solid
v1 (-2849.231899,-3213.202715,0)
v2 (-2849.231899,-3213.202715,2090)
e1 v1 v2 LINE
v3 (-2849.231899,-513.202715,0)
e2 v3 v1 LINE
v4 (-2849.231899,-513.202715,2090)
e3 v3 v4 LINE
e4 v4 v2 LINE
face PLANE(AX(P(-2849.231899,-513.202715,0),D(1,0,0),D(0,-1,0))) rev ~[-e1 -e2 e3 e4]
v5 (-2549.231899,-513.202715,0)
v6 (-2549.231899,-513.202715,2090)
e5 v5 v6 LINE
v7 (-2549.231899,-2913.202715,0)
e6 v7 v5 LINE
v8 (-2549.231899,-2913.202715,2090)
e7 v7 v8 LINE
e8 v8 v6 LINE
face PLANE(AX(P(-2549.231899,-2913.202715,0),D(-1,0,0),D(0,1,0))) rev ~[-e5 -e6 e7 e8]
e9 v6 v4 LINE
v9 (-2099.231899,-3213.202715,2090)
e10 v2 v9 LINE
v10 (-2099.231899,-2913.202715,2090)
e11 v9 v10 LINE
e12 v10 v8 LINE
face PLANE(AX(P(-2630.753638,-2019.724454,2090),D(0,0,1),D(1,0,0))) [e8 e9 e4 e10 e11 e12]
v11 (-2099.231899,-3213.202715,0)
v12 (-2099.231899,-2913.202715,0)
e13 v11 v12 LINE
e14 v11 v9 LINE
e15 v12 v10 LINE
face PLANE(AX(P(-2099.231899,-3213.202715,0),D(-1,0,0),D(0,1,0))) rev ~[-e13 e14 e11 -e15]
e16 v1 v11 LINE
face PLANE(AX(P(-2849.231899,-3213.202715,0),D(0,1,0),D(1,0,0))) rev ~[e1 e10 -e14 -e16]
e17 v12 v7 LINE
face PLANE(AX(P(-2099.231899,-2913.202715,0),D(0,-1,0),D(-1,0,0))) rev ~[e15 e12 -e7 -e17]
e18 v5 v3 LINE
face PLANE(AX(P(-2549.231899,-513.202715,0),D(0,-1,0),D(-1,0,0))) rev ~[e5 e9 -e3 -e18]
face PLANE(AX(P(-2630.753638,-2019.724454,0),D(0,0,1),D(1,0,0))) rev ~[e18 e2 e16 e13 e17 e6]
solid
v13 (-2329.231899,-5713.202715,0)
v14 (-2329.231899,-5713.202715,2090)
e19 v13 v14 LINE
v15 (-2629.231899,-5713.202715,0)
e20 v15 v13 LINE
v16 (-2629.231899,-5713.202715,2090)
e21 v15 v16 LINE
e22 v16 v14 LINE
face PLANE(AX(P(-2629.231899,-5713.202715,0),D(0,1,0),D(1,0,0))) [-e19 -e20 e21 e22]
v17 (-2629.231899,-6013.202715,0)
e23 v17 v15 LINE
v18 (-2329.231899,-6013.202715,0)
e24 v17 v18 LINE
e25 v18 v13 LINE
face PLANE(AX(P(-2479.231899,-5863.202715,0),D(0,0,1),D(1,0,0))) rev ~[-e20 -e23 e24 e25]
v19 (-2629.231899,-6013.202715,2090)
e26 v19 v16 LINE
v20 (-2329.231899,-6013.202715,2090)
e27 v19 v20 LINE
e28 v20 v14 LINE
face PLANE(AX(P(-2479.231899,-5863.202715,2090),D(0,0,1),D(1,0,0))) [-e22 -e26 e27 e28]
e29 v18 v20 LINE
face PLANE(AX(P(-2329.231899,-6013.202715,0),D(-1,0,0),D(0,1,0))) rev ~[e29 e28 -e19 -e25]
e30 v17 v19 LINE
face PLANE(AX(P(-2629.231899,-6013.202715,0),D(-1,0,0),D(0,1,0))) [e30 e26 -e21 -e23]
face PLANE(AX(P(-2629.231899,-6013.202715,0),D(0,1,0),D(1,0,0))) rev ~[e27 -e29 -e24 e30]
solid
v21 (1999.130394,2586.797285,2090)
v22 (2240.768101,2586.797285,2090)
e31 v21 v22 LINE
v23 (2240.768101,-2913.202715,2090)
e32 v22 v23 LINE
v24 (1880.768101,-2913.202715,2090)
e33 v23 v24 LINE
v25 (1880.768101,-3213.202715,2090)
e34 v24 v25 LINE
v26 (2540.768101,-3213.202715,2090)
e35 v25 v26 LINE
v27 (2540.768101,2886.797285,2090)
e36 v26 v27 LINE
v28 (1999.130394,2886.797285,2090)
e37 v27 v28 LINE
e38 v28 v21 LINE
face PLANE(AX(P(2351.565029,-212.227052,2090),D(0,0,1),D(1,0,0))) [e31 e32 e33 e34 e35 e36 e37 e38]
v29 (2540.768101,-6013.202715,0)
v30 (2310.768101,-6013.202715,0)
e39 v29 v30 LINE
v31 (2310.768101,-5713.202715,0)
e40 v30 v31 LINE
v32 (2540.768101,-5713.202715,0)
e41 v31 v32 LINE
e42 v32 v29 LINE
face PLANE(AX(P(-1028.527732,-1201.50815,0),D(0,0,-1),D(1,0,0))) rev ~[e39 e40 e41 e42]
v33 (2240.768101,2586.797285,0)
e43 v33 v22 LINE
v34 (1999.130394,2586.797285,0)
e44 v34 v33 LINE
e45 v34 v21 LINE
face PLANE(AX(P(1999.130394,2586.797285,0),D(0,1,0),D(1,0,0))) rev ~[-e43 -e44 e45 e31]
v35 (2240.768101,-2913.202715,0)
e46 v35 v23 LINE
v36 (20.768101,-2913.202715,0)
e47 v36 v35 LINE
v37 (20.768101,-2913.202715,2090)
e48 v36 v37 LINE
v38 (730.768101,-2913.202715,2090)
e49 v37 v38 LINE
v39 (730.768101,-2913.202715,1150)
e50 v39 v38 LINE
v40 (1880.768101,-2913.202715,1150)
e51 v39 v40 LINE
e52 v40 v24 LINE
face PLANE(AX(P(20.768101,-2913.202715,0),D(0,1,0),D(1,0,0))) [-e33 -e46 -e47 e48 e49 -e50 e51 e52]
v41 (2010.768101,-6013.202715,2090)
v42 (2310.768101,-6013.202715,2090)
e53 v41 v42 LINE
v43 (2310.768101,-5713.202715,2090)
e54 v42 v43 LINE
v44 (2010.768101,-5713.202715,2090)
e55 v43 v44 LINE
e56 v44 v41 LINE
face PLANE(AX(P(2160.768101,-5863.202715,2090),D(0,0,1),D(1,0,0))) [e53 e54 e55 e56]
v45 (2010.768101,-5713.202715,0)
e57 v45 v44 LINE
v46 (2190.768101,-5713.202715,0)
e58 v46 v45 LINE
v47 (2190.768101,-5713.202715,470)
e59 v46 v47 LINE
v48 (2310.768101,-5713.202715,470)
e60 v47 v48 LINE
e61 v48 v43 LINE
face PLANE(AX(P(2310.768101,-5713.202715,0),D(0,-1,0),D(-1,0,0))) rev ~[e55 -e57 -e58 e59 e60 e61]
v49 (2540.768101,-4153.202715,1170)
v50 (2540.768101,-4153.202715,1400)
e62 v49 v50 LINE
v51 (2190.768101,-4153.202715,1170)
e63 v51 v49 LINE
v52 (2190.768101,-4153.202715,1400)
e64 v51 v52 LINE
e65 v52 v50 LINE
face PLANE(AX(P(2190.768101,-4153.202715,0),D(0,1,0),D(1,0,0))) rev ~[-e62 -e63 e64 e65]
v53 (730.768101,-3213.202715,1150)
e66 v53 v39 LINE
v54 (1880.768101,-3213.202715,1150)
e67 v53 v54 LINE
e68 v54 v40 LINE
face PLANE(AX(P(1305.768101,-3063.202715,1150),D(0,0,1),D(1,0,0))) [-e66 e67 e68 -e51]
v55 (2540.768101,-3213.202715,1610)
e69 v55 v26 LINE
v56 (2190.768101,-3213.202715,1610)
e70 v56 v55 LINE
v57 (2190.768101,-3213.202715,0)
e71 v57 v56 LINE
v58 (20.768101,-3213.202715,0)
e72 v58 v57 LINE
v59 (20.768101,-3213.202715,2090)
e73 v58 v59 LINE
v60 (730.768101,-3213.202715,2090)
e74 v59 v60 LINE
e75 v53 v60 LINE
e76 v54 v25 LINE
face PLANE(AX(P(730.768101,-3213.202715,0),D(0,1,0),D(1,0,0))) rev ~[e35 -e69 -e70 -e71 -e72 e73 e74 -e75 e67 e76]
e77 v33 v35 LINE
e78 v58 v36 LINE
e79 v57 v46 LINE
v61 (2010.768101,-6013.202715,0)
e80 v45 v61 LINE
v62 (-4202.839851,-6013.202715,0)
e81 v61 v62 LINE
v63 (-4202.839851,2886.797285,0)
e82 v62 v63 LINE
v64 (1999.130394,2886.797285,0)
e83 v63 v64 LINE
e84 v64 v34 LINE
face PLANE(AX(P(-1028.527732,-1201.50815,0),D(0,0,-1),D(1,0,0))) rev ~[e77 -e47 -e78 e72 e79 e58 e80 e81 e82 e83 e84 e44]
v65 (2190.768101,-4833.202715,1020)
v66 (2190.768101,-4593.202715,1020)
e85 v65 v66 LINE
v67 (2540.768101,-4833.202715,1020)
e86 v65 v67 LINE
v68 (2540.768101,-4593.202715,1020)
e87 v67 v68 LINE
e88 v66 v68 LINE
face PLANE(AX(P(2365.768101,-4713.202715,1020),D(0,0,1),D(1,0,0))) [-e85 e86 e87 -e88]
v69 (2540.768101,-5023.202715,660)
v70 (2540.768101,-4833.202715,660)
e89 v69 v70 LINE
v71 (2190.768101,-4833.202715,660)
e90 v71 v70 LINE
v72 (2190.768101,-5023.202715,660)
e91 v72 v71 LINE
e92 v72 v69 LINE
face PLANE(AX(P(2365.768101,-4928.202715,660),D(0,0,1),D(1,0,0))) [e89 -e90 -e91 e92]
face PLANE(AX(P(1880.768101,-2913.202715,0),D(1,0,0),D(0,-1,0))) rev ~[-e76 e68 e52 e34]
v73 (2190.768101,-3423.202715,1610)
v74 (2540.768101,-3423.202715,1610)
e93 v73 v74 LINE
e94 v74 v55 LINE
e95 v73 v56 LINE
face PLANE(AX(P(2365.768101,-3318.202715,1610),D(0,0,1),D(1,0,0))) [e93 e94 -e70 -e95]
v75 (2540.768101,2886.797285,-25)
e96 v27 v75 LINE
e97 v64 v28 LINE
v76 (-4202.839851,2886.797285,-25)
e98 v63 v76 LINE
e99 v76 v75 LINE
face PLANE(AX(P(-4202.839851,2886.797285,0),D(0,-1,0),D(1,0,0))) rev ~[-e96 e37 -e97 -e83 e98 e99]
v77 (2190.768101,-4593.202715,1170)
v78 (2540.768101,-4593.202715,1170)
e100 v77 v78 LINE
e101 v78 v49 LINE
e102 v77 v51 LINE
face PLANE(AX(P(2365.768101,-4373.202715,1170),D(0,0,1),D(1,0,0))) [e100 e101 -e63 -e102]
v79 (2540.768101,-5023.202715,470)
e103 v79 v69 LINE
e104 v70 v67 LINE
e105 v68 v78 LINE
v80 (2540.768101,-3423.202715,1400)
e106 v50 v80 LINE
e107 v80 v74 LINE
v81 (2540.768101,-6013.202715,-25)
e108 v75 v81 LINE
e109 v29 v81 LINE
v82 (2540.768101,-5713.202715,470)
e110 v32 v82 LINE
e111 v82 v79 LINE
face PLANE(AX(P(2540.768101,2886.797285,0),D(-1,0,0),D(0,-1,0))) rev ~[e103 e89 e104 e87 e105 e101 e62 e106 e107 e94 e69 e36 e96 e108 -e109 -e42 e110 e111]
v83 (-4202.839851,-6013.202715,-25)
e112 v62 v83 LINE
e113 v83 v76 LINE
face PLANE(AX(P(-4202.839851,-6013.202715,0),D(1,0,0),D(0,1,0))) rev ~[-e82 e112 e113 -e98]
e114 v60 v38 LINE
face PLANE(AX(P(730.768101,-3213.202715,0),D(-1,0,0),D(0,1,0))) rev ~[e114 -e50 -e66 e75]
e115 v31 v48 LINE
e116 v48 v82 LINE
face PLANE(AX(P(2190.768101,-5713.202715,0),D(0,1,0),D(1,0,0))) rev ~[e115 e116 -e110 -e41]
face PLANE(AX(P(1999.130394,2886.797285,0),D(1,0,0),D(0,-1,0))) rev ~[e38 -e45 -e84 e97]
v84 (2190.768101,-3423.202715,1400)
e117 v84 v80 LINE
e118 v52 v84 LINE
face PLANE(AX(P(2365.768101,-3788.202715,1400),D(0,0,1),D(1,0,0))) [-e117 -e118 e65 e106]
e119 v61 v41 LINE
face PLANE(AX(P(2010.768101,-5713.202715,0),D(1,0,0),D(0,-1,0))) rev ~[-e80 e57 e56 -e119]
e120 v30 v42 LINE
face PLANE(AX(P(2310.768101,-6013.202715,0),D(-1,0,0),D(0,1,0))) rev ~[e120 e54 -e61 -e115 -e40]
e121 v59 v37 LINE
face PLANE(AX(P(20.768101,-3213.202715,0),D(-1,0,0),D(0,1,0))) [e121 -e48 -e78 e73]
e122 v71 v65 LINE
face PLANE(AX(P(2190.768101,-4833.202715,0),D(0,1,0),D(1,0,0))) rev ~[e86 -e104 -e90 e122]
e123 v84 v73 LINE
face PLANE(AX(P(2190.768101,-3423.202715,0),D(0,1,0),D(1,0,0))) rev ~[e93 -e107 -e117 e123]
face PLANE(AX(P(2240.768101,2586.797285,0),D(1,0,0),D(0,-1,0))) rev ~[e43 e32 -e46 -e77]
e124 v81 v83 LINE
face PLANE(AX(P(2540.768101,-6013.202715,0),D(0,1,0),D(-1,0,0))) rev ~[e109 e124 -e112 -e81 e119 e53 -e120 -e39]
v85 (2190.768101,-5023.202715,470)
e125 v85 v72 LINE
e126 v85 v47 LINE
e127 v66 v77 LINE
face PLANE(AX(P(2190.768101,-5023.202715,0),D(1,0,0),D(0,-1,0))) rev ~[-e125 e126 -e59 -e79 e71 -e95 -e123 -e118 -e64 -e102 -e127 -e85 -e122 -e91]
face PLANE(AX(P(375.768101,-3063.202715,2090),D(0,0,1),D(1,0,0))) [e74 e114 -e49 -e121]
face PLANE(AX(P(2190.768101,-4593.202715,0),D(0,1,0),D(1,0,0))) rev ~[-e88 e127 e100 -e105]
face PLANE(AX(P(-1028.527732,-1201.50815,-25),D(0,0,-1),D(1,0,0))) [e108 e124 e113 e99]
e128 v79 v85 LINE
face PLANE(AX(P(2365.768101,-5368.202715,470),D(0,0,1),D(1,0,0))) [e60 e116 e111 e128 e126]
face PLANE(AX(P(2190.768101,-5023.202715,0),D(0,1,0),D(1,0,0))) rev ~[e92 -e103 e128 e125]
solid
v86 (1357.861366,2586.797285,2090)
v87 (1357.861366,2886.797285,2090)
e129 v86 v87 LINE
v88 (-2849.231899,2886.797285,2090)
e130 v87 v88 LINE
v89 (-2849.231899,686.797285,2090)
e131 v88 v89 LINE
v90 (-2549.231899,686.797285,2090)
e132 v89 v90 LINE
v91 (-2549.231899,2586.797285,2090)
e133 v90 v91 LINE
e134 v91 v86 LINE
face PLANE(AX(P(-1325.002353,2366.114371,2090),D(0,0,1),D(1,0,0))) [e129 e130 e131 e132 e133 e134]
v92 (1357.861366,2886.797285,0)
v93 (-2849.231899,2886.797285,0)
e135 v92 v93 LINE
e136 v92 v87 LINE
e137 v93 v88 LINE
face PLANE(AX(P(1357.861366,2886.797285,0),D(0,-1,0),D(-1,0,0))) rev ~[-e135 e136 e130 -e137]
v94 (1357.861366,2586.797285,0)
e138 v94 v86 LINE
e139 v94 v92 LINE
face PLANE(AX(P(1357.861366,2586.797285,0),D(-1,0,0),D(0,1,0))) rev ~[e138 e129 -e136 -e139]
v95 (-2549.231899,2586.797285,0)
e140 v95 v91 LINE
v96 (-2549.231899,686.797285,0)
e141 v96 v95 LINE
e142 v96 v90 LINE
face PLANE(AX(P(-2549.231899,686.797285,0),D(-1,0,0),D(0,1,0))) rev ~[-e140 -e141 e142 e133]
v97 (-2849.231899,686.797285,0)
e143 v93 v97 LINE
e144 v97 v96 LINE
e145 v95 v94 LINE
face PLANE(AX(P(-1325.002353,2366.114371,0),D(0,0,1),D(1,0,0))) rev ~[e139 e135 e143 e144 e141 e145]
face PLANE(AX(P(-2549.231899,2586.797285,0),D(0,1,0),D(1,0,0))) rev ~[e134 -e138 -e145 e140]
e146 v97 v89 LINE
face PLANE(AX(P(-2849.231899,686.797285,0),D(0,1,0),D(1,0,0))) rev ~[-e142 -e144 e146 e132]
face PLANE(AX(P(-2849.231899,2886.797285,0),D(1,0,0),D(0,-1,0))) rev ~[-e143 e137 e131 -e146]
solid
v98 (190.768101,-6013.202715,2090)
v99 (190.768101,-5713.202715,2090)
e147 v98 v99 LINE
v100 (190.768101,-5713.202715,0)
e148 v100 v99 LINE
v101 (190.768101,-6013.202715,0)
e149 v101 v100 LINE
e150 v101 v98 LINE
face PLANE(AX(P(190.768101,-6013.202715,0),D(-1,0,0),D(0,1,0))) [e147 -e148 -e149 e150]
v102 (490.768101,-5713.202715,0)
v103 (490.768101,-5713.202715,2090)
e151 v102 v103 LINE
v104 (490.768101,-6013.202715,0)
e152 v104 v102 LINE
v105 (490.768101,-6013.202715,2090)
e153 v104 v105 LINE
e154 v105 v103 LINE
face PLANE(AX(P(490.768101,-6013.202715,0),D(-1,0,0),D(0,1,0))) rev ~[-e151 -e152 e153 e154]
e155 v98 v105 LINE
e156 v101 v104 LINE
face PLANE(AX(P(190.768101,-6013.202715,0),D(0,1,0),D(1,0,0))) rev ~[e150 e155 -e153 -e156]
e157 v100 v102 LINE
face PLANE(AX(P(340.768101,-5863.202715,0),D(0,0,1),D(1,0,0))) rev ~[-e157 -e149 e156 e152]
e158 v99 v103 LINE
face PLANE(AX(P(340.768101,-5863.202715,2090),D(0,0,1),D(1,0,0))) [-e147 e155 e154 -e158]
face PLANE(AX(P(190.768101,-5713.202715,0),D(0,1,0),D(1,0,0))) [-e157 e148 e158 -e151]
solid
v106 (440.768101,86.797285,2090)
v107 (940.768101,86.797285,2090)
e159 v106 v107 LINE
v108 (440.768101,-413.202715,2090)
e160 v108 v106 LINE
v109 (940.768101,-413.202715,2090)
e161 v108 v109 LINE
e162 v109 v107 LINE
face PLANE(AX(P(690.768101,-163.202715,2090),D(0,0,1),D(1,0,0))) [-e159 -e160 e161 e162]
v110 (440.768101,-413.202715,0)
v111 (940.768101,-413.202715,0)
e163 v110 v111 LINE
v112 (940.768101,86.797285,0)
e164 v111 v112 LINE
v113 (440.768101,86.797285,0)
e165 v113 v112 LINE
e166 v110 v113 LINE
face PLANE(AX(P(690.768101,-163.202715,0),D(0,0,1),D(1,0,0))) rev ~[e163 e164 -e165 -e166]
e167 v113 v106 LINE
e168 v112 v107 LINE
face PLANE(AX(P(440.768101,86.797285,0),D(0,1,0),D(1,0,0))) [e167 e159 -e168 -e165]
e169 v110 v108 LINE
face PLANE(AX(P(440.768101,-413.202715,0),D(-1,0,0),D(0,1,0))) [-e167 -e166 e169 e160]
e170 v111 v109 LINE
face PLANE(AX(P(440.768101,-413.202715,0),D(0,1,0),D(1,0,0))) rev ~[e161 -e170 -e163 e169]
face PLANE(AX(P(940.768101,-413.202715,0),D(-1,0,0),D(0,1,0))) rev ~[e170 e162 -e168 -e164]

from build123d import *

# Parameters (mm, degrees)
F0_W      = 350
F0_H      = 210
F1_DEPTH  = 1610
F0_H_2    = 730
F2_DEPTH  = 1400
F0_H_3    = 440
F3_DEPTH  = 1170
F0_H_4    = 240
F4_DEPTH  = 1020
F0_H_5    = 190
F5_DEPTH  = 660
F6_DEPTH  = 470
F0_W_2    = 300
F0_H_6    = 300
F7_DEPTH  = 2090
F8_DEPTH  = 2090
F0_W_3    = 500
F0_H_7    = 500
F0_W_4    = 710
F10_DEPTH = 25
F11_W     = 1150
F11_H     = 300
F12_DEPTH = 1150


# Not quite as in the source:
# - a feature of the source that left no trace in its solid (it failed there, or was rolled back) is left out


with BuildPart() as f1:
    # F0 (on Top) → F1 (new body)
    with BuildSketch(Plane.XY):
        with Locations((2365.7681007385, -3318.20271492)):
            Rectangle(F0_W, F0_H)
    extrude(amount=F1_DEPTH)

    # F0 (on Top) → F2 (join)
    with BuildSketch(Plane.XY):
        with Locations((2365.7681007385, -3788.20271492)):
            Rectangle(F0_W, F0_H_2)
    extrude(amount=F2_DEPTH)

    # F0 (on Top) → F3 (join)
    with BuildSketch(Plane.XY):
        with Locations((2365.7681007385, -4373.20271492)):
            Rectangle(F0_W, F0_H_3)
    extrude(amount=F3_DEPTH)

    # F0 (on Top) → F4 (join)
    with BuildSketch(Plane.XY):
        with Locations((2365.7681007385, -4713.20271492)):
            Rectangle(F0_W, F0_H_4)
    extrude(amount=F4_DEPTH)

    # F0 (on Top) → F5 (join)
    with BuildSketch(Plane.XY):
        with Locations((2365.7681007385, -4928.20271492)):
            Rectangle(F0_W, F0_H_5)
    extrude(amount=F5_DEPTH)

    # F0 (on Top) → F6 (join)
    with BuildSketch(Plane.XY):
        Polygon((2540.7681007385, -5023.20271492), (2190.7681007385, -5023.20271492), (2190.7681007385, -5713.20271492), (2310.7681007385, -5713.20271492), (2540.7681007385, -5713.20271492), align=None)
    extrude(amount=F6_DEPTH)

    # F0 (on Top) → F7, piece 3 (join)
    with BuildSketch(Plane.XY):
        Polygon((2310.7681007385, -5713.20271492), (2190.7681007385, -5713.20271492), (2010.7681007385, -5713.20271492), (2010.7681007385, -6013.20271492), (2310.7681007385, -6013.20271492), align=None)
    extrude(amount=F7_DEPTH)

    # F0 (on Top) → F8, piece 5 (join)
    with BuildSketch(Plane.XY):
        Polygon((2240.7681007385, -2913.20271492), (1880.7681007385, -2913.20271492), (1880.7681007385, -3213.20271492), (2190.7681007385, -3213.20271492), (2540.7681007385, -3213.20271492), (2540.7681007385, 2886.79728508), (1999.1303939819, 2886.79728508), (1999.1303939819, 2586.79728508), (2240.7681007385, 2586.79728508), align=None)
    extrude(amount=F8_DEPTH)



with BuildPart() as f7:
    # F0 (on Top) → F7 (new body)
    with BuildSketch(Plane.XY):
        with Locations((-2479.2318992615, -5863.20271492)):
            Rectangle(F0_W_2, F0_H_6)
    extrude(amount=F7_DEPTH)


with BuildPart() as f7b:
    # F0 (on Top) → F7, piece 2 (new body)
    with BuildSketch(Plane.XY):
        with Locations((340.7681007385, -5863.20271492)):
            Rectangle(F0_W_2, F0_H_6)
    extrude(amount=F7_DEPTH)


with BuildPart() as f8:
    # F0 (on Top) → F8 (new body)
    with BuildSketch(Plane.XY):
        Polygon((-2849.2318992615, 686.79728508), (-2549.2318992615, 686.79728508), (-2549.2318992615, 2586.79728508), (1357.8613657951, 2586.79728508), (1357.8613657951, 2886.79728508), (-2849.2318992615, 2886.79728508), align=None)
    extrude(amount=F8_DEPTH)


with BuildPart() as f8b:
    # F0 (on Top) → F8, piece 2 (new body)
    with BuildSketch(Plane.XY):
        with Locations((690.7681007385, -163.20271492)):
            Rectangle(F0_W_3, F0_H_7)
    extrude(amount=F8_DEPTH)


with BuildPart() as f8c:
    # F0 (on Top) → F8, piece 3 (new body)
    with BuildSketch(Plane.XY):
        Polygon((-2099.2318992615, -2913.20271492), (-2549.2318992615, -2913.20271492), (-2549.2318992615, -513.20271492), (-2849.2318992615, -513.20271492), (-2849.2318992615, -3213.20271492), (-2099.2318992615, -3213.20271492), align=None)
    extrude(amount=F8_DEPTH)


with BuildPart() as f8d:
    # F0 (on Top) → F8, piece 4 (new body)
    with BuildSketch(Plane.XY):
        with Locations((375.7681007385, -3063.20271492)):
            Rectangle(F0_W_4, F0_H_6)
    extrude(amount=F8_DEPTH)


with BuildPart() as f1_1:
    add(f1.part)

    add(f8d.part)  # F10 merges F8d
    # F9 (on face) → F10 (join)
    with BuildSketch(Plane(origin=(0, 0, 0), x_dir=(1, 0, 0), z_dir=(0, 0, -1))):
        Polygon((-4202.8398513794, -2886.79728508), (-2849.2318992615, -2886.79728508), (-2849.2318992615, -686.79728508), (-2549.2318992615, -686.79728508), (-2549.2318992615, -2586.79728508), (1357.8613657951, -2586.79728508), (1357.8613657951, -2886.79728508), (2540.7681007385, -2886.79728508), (2540.7681007385, 6013.20271492), (-2849.2318992615, 6013.20271492), (-4202.8398513794, 6013.20271492), align=None)
        Polygon((-2849.2318992615, -686.79728508), (-2849.2318992615, -2886.79728508), (1357.8613657951, -2886.79728508), (1357.8613657951, -2586.79728508), (-2549.2318992615, -2586.79728508), (-2549.2318992615, -686.79728508), align=None)
    extrude(amount=F10_DEPTH)

    # F11 (on face) → F12 (join)
    with BuildSketch(Plane.XY):
        with Locations((1305.7681007385, -3063.20271492)):
            Rectangle(F11_W, F11_H)
    extrude(amount=F12_DEPTH)


solid = Compound([f7.part, f7b.part, f8.part, f8b.part, f8c.part, f1_1.part])
